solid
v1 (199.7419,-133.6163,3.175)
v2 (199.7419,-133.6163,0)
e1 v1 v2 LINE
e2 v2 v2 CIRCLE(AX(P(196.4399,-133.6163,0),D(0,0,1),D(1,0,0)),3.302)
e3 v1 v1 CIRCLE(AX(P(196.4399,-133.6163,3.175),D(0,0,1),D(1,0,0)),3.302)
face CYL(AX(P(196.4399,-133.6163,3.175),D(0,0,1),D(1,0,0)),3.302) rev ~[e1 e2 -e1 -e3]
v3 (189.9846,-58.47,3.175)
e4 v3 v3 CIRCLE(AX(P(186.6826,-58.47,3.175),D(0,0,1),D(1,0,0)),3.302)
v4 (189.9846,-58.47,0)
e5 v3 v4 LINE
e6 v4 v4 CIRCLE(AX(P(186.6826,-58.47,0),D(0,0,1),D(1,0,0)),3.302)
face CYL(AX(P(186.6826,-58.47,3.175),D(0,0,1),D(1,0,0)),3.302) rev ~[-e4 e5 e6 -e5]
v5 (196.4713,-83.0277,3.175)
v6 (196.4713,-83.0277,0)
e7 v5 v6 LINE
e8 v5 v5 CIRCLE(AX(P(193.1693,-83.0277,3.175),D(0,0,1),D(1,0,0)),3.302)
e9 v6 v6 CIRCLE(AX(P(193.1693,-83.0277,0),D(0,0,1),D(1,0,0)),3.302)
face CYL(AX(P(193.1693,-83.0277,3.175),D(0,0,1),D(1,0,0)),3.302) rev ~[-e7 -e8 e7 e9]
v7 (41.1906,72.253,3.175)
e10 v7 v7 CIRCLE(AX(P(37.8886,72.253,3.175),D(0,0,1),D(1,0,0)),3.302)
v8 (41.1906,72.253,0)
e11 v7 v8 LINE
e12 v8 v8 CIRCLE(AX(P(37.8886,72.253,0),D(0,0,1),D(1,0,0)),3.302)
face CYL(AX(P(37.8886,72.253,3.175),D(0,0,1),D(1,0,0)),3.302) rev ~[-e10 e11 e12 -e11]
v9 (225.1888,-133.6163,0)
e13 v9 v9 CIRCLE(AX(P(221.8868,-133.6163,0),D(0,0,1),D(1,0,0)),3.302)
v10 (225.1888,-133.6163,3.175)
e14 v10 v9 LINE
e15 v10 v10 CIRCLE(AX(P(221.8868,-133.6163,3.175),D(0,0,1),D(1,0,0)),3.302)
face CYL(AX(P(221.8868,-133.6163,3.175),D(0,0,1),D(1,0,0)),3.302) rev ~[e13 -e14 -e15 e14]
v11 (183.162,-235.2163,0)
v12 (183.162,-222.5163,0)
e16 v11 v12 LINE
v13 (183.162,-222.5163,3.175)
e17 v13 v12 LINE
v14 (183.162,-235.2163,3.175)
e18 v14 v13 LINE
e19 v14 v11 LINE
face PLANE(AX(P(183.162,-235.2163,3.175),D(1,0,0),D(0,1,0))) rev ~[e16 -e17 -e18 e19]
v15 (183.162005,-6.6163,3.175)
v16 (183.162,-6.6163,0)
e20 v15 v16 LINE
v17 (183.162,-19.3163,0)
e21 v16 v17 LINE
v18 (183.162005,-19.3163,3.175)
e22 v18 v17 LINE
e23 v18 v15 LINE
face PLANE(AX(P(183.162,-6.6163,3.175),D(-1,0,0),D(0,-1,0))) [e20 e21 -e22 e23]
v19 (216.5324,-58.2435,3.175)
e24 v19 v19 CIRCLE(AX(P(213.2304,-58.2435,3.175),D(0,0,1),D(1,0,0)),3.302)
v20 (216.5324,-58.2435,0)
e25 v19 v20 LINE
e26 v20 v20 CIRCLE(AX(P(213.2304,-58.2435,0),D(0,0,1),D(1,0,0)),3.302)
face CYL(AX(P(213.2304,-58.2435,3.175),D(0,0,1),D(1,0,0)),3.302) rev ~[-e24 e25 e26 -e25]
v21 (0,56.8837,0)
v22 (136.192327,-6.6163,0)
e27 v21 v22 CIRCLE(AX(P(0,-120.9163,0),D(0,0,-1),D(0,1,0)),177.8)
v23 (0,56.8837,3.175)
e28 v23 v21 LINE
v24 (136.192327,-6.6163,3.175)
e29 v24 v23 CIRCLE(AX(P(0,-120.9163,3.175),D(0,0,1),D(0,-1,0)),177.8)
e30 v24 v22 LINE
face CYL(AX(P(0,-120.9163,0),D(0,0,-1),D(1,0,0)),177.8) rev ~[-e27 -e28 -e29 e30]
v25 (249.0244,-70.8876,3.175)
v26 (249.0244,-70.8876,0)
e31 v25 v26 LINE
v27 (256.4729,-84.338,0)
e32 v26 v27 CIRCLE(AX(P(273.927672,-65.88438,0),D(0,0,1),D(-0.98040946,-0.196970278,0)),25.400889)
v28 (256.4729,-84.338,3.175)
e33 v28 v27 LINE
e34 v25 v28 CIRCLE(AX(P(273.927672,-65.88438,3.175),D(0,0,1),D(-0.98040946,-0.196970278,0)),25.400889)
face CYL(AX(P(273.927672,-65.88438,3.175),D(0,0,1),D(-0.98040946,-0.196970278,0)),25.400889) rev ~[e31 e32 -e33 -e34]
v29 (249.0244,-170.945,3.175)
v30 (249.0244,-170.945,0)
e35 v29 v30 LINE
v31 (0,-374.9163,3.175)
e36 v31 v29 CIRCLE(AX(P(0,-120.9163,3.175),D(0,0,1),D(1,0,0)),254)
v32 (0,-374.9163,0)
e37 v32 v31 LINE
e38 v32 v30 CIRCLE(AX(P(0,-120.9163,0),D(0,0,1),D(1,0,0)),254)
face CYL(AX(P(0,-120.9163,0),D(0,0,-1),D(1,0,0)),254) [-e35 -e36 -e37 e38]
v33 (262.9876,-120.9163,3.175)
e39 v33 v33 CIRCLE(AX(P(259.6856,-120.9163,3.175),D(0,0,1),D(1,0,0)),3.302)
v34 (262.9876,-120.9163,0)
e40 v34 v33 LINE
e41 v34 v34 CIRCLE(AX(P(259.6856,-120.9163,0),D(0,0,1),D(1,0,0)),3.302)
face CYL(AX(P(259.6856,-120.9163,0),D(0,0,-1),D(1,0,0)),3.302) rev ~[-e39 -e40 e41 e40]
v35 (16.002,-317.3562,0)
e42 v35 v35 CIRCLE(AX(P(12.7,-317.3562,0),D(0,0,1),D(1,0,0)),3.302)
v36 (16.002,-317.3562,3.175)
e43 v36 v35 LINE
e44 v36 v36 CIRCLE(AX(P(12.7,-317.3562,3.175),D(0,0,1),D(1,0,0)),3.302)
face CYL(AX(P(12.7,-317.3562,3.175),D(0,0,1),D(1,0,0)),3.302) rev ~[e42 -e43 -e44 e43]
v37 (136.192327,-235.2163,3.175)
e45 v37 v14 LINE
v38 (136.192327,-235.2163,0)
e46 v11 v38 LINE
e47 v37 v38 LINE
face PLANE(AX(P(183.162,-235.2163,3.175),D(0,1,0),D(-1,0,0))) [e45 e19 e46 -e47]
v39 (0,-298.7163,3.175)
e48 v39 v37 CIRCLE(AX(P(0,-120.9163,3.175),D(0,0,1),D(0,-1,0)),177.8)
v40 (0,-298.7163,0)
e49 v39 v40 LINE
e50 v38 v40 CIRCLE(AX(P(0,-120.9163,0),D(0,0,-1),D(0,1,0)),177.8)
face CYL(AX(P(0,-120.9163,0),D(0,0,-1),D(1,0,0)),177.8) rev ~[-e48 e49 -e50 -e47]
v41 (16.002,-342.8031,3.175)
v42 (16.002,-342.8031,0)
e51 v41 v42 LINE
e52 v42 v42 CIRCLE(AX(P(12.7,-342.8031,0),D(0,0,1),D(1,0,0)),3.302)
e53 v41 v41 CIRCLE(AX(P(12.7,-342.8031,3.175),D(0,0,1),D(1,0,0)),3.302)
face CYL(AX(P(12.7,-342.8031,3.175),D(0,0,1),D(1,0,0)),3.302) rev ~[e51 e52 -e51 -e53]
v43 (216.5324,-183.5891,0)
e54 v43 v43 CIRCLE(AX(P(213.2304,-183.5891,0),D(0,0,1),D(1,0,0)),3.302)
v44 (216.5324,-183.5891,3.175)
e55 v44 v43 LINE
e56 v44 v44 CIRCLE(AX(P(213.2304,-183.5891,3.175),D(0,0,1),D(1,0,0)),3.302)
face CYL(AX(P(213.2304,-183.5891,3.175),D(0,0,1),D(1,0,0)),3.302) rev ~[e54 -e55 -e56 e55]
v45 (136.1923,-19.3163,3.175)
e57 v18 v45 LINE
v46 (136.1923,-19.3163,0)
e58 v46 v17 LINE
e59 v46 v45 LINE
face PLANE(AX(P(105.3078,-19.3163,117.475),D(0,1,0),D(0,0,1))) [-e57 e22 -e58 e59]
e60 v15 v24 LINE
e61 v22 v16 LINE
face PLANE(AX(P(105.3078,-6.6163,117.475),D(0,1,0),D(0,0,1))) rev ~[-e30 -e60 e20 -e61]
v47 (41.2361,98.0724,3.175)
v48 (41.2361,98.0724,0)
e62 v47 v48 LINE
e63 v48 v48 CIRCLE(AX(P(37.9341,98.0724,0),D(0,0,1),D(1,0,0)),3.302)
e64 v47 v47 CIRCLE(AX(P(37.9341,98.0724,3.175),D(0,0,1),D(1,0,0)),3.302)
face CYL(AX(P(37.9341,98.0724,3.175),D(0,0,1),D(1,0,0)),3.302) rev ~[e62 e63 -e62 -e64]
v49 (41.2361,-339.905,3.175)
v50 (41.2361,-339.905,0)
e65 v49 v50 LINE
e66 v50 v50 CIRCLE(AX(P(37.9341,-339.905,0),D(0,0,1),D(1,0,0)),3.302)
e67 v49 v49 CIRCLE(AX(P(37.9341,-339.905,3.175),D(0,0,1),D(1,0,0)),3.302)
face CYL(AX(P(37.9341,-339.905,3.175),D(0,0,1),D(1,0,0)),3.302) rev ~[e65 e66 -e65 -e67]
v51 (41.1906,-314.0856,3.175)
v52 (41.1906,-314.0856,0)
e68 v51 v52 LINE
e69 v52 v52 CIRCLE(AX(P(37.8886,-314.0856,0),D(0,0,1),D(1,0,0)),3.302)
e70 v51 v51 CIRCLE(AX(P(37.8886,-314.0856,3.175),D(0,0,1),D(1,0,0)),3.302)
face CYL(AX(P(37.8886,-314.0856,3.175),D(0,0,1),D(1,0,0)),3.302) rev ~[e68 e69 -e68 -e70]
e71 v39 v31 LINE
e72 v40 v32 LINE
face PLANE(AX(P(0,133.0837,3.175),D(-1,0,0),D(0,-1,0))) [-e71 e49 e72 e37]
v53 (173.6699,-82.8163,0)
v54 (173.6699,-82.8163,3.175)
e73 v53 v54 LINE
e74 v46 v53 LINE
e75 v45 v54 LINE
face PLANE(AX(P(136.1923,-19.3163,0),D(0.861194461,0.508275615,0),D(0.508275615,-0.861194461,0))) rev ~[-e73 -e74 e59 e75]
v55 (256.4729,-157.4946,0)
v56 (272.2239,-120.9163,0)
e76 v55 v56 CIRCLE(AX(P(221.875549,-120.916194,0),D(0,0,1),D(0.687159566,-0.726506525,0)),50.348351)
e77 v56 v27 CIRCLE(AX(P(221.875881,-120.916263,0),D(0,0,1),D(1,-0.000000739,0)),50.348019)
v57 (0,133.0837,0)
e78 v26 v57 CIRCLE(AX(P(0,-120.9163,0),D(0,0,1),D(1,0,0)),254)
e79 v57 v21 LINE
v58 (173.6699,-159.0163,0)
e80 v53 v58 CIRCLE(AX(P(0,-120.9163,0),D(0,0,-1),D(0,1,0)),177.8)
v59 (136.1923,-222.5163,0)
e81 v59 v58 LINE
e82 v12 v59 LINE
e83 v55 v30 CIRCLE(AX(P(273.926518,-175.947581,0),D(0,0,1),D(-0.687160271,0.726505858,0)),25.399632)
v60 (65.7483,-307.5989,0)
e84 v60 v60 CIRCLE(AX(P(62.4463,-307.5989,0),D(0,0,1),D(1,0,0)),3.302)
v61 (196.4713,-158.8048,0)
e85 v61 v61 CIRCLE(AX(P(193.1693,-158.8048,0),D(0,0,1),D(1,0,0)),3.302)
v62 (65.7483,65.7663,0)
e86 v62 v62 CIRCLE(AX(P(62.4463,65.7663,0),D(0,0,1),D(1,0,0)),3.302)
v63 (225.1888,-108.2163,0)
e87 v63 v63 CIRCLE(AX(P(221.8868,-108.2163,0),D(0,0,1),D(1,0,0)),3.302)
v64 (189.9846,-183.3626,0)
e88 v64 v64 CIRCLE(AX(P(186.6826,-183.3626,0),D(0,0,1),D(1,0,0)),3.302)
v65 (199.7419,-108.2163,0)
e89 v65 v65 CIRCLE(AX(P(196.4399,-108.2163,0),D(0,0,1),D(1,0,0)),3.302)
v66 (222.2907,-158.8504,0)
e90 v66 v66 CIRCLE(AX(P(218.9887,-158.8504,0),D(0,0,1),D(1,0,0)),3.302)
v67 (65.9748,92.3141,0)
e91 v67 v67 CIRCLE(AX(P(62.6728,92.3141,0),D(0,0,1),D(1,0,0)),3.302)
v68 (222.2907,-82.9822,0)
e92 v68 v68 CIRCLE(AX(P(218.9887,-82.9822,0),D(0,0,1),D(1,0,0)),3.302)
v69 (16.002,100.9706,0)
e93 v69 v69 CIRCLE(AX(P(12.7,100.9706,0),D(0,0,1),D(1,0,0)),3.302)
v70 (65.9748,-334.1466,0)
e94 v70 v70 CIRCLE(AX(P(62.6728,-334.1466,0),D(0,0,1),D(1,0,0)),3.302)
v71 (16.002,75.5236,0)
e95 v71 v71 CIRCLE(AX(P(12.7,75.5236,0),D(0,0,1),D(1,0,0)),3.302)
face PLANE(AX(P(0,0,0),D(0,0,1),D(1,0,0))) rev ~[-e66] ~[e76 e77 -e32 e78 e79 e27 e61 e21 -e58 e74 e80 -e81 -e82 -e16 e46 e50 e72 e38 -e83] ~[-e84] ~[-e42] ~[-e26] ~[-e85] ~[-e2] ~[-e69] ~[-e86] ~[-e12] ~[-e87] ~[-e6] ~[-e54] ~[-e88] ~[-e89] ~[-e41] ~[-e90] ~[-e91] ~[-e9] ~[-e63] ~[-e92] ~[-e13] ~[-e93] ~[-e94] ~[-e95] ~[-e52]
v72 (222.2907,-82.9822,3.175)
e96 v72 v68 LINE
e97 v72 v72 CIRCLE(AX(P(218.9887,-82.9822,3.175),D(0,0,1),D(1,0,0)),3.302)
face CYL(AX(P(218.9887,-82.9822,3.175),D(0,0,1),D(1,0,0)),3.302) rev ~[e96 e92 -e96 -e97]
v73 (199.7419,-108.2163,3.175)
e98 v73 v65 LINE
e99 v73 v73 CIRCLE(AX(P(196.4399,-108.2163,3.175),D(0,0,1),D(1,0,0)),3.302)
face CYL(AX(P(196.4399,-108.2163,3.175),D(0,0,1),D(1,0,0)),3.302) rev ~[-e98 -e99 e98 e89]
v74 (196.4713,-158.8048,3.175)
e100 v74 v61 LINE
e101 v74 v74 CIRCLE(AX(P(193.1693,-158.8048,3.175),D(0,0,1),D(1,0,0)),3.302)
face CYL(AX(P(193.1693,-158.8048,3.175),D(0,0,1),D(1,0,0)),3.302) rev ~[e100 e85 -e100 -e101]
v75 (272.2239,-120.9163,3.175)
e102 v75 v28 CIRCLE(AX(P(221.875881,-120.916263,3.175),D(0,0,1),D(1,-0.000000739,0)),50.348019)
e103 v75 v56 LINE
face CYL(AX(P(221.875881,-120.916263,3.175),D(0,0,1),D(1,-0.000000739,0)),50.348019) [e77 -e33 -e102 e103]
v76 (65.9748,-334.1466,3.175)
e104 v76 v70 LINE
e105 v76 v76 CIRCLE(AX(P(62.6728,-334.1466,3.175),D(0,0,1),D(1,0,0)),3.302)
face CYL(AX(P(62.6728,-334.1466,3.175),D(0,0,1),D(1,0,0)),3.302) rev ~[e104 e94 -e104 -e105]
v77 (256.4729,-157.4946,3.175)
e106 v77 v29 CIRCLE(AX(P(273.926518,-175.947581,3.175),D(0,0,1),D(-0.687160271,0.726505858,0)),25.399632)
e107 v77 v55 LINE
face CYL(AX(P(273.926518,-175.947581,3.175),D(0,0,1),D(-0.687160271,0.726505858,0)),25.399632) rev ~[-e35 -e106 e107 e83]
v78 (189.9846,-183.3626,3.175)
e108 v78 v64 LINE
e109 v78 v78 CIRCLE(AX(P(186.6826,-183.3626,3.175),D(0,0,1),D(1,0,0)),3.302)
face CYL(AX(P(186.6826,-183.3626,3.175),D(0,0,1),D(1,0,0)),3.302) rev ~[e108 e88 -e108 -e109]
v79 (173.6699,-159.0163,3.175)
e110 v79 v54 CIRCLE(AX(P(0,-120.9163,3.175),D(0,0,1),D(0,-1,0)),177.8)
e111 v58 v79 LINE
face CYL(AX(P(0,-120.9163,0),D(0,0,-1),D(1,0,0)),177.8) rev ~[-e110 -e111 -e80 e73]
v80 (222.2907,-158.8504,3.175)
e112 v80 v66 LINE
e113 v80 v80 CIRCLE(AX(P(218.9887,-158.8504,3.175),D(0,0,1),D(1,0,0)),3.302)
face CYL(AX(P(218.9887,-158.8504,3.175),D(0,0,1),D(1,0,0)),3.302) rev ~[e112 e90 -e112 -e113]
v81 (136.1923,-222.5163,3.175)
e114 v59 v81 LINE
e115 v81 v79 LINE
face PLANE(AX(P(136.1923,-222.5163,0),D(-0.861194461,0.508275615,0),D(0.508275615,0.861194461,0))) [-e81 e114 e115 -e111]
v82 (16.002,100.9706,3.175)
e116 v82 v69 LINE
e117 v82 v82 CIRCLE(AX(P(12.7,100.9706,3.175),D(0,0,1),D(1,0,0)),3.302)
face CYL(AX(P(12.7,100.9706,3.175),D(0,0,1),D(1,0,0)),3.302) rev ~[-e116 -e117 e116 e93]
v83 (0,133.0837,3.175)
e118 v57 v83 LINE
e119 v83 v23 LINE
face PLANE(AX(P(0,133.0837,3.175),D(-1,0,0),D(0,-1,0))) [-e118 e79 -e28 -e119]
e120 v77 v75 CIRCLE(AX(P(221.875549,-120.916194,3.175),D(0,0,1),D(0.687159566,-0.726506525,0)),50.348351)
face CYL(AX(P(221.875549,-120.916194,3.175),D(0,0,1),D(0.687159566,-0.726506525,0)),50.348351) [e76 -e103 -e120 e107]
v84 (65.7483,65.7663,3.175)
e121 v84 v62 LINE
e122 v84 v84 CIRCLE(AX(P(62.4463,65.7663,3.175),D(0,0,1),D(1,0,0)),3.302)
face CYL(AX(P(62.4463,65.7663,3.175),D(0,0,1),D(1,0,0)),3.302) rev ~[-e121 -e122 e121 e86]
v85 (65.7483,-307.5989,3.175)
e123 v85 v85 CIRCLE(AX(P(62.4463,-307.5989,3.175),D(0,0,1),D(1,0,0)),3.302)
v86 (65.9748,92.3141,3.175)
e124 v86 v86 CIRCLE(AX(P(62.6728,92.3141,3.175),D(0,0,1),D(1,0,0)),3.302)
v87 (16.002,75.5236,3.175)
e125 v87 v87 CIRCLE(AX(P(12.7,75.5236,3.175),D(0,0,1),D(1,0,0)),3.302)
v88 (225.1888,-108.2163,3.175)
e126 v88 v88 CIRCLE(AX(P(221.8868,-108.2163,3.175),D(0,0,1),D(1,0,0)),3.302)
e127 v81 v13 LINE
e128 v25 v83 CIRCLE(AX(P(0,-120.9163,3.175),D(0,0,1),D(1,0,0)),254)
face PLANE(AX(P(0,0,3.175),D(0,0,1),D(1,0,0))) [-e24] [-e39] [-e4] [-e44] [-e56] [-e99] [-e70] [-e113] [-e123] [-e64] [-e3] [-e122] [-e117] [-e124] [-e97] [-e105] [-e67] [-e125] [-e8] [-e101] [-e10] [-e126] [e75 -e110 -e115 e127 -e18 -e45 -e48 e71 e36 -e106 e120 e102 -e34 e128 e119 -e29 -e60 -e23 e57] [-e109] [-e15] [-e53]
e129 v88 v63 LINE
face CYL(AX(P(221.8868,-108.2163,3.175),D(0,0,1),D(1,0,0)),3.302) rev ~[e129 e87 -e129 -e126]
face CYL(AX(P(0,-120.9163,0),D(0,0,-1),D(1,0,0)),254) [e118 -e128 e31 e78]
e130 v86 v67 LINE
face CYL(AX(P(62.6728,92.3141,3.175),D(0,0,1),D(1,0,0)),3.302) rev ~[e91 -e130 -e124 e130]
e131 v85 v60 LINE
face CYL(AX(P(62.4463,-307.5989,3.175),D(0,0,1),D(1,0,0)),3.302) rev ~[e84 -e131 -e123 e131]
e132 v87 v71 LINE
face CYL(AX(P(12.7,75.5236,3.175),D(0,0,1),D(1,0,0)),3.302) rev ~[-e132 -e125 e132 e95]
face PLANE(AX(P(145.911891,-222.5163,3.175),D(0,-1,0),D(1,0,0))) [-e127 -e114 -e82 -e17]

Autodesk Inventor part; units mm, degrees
ref_plane "YZ Plane" through (0, 0, 0) normal (1, 0, 0) x (0, 1, 0)
ref_plane "XZ Plane" through (0, 0, 0) normal (0, 1, 0) x (-1, 0, 0)
sketch "Sketch1" plane through (0, 0, 0) normal (0, 0, 1) x (1, 0, 0)
  circle A0 centre (62.4463, 65.7663) radius 3.175 projected
  circle A1 centre (37.8886, 72.253) radius 3.175 projected
  circle A2 centre (12.7, 75.5236) radius 3.175 projected
  circle A3 centre (12.7, 100.9706) radius 3.175 projected
  circle A4 centre (37.9341, 98.0724) radius 3.175 projected
  circle A5 centre (62.6728, 92.3141) radius 3.175 projected
  circle A6 centre (-62.6728, 92.3141) radius 3.175 projected
  circle A7 centre (-37.9341, 98.0724) radius 3.175 projected
  circle A8 centre (-12.7, 100.9706) radius 3.175 projected
  circle A9 centre (-12.7, 75.5236) radius 3.175 projected
  circle A10 centre (-37.8886, 72.253) radius 3.175 projected
  circle A11 centre (-62.4463, 65.7663) radius 3.175 projected
  circle A12 centre (-196.4399, -108.2163) radius 3.175 projected
  circle A13 centre (-193.1693, -83.0277) radius 3.175 projected
  circle A14 centre (-186.6826, -58.47) radius 3.175 projected
  circle A15 centre (-213.2304, -58.2435) radius 3.175 projected
  circle A16 centre (-218.9887, -82.9822) radius 3.175 projected
  circle A17 centre (-221.8868, -108.2163) radius 3.175 projected
  circle A18 centre (196.4399, -108.2163) radius 3.175 projected
  circle A19 centre (193.1693, -83.0277) radius 3.175 projected
  circle A20 centre (186.6826, -58.47) radius 3.175 projected
  circle A21 centre (213.2304, -58.2435) radius 3.175 projected
  circle A22 centre (218.9887, -82.9822) radius 3.175 projected
  circle A23 centre (221.8868, -108.2163) radius 3.175 projected
  arc A24 (241.3, -120.9163) -> (-241.3, -120.9163) centre (0, -120.9163) ccw projected
  line L0 (-241.3, -120.9163) -> (-177.8, -120.9163) projected
  arc A25 (177.8, -120.9163) -> (-177.8, -120.9163) centre (0, -120.9163) ccw projected
  line L1 (177.8, -120.9163) -> (241.3, -120.9163) projected
  circle A26 centre (-62.4463, -307.5989) radius 3.175 projected
  circle A27 centre (-37.8886, -314.0856) radius 3.175 projected
  circle A28 centre (-12.7, -317.3562) radius 3.175 projected
  circle A29 centre (-12.7, -342.8031) radius 3.175 projected
  circle A30 centre (-37.9341, -339.905) radius 3.175 projected
  circle A31 centre (-62.6728, -334.1466) radius 3.175 projected
  circle A32 centre (62.6728, -334.1466) radius 3.175 projected
  circle A33 centre (37.9341, -339.905) radius 3.175 projected
  circle A34 centre (12.7, -342.8031) radius 3.175 projected
  circle A35 centre (12.7, -317.3562) radius 3.175 projected
  circle A36 centre (37.8886, -314.0856) radius 3.175 projected
  circle A37 centre (62.4463, -307.5989) radius 3.175 projected
  circle A38 centre (196.4399, -133.6163) radius 3.175 projected
  circle A39 centre (193.1693, -158.8048) radius 3.175 projected
  circle A40 centre (186.6826, -183.3626) radius 3.175 projected
  circle A41 centre (213.2304, -183.5891) radius 3.175 projected
  circle A42 centre (218.9887, -158.8504) radius 3.175 projected
  circle A43 centre (221.8868, -133.6163) radius 3.175 projected
  circle A44 centre (-196.4399, -133.6163) radius 3.175 projected
  circle A45 centre (-193.1693, -158.8048) radius 3.175 projected
  circle A46 centre (-186.6826, -183.3626) radius 3.175 projected
  circle A47 centre (-213.2304, -183.5891) radius 3.175 projected
  circle A48 centre (-218.9887, -158.8504) radius 3.175 projected
  circle A49 centre (-221.8868, -133.6163) radius 3.175 projected
  arc A50 (-241.3, -120.9163) -> (241.3, -120.9163) centre (0, -120.9163) ccw projected
  line L2 (241.3, -120.9163) -> (177.8, -120.9163) projected
  arc A51 (-177.8, -120.9163) -> (177.8, -120.9163) centre (0, -120.9163) ccw projected
  line L3 (-177.8, -120.9163) -> (-241.3, -120.9163) projected
  circle A52 centre (0, -120.9163) radius 254
  line L4 (-254, -120.9163) -> (-254, 133.0837)
  line L5 (0, 133.0837) -> (-254, 133.0837)
  line L6 (-254, 100.9706) -> (-254, 104.1456)
  line L7 (-254, 56.8837) -> (-254, 60.0587)
  line L8 (0, -120.9163) -> (-254, 133.0837)
  line L9 (-179.6051, 58.6888) -> (-254, 133.0837)
  circle A53 centre (-216.8026, 95.8863) radius 3.302
  circle A54 centre (259.6856, -120.9163) radius 3.302
  arc A55 (271.0214, -121.5373) -> (259.974, -104.2042) centre (252.2597, -121.3082) ccw
  arc A56 (252.5671, -93.9743) -> (259.974, -104.2042) centre (265.1954, -92.6272) ccw
  line L10 (252.5671, -93.9743) -> (247.0534, -93.9743)
  line L11 (247.0534, -93.9743) -> (247.0534, -120.9163)
  arc A57 (257.0711, -139.4439) -> (271.0214, -121.5373) centre (252.2597, -121.3082) ccw
  arc A58 (257.0711, -139.4439) -> (252.5671, -147.8582) centre (265.1954, -149.2053) ccw
  line L12 (252.5671, -147.8582) -> (247.0534, -147.8582)
  line L13 (247.0534, -147.8582) -> (247.0534, -120.9163)
  line L14 (-254, -120.9163) -> (-254, -374.9163)
  line L15 (-254, -374.9163) -> (0, -374.9163)
  point P0 (0, 0)
  dimension "d0" = 508
  dimension "d3" = 6.604
  dimension "d7" = 6.604
  dimension "d8" = 12.7
extrude "Extrusion1" add sketch "Sketch1" along normal blind 3.175 contours L1 A25 L8 A24 | A50 L0 A51 L1 | L8 A25 L0 A24 | A52 L12 L13 L11 L10 | A52 A56 A55 A57 A58 | L10 L11 L13 L12 A52 | A52 L8 A53 L5 | L15 L14 A52 | A52 L4 L8 A53 | A53 L8 | L8 A53
sketch "Sketch2" plane through (0, 0, 3.175) normal (0, 0, 1) x (1, 0, 0)
  circle A0 centre (259.6856, -120.9163) radius 3.302 projected
  arc A1 (252.5671, -93.9743) -> (0, 133.0837) centre (0, -120.9163) ccw projected
  line L0 (0, 133.0837) -> (-254, 133.0837) projected
  line L1 (-254, 133.0837) -> (-254, -374.9163) projected
  line L2 (-254, -374.9163) -> (0, -374.9163) projected
  arc A2 (0, -374.9163) -> (252.5671, -147.8582) centre (0, -120.9163) ccw projected
  arc A3 (257.0711, -139.4439) -> (252.5671, -147.8582) centre (265.1954, -149.2053) ccw projected
  arc A4 (257.0711, -139.4439) -> (259.974, -104.2042) centre (252.2597, -121.3082) ccw projected
  arc A5 (252.5671, -93.9743) -> (259.974, -104.2042) centre (265.1954, -92.6272) ccw projected
  circle A6 centre (-62.4463, -307.5989) radius 3.175 projected
  circle A7 centre (-37.8886, -314.0856) radius 3.175 projected
  circle A8 centre (-12.7, -317.3562) radius 3.175 projected
  circle A9 centre (-12.7, -342.8031) radius 3.175 projected
  circle A10 centre (-37.9341, -339.905) radius 3.175 projected
  circle A11 centre (-62.6728, -334.1466) radius 3.175 projected
  circle A12 centre (62.6728, -334.1466) radius 3.175 projected
  circle A13 centre (37.9341, -339.905) radius 3.175 projected
  circle A14 centre (12.7, -342.8031) radius 3.175 projected
  circle A15 centre (12.7, -317.3562) radius 3.175 projected
  circle A16 centre (37.8886, -314.0856) radius 3.175 projected
  circle A17 centre (62.4463, -307.5989) radius 3.175 projected
  circle A18 centre (196.4399, -133.6163) radius 3.175 projected
  circle A19 centre (193.1693, -158.8048) radius 3.175 projected
  circle A20 centre (186.6826, -183.3626) radius 3.175 projected
  circle A21 centre (213.2304, -183.5891) radius 3.175 projected
  circle A22 centre (218.9887, -158.8504) radius 3.175 projected
  circle A23 centre (221.8868, -133.6163) radius 3.175 projected
  circle A24 centre (-196.4399, -133.6163) radius 3.175 projected
  circle A25 centre (-193.1693, -158.8048) radius 3.175 projected
  circle A26 centre (-186.6826, -183.3626) radius 3.175 projected
  circle A27 centre (-213.2304, -183.5891) radius 3.175 projected
  circle A28 centre (-218.9887, -158.8504) radius 3.175 projected
  circle A29 centre (-221.8868, -133.6163) radius 3.175 projected
  circle A30 centre (221.8868, -108.2163) radius 3.175 projected
  circle A31 centre (218.9887, -82.9822) radius 3.175 projected
  circle A32 centre (213.2304, -58.2435) radius 3.175 projected
  circle A33 centre (186.6826, -58.47) radius 3.175 projected
  circle A34 centre (193.1693, -83.0277) radius 3.175 projected
  circle A35 centre (196.4399, -108.2163) radius 3.175 projected
  circle A36 centre (-221.8868, -108.2163) radius 3.175 projected
  circle A37 centre (-218.9887, -82.9822) radius 3.175 projected
  circle A38 centre (-213.2304, -58.2435) radius 3.175 projected
  circle A39 centre (-186.6826, -58.47) radius 3.175 projected
  circle A40 centre (-193.1693, -83.0277) radius 3.175 projected
  circle A41 centre (-196.4399, -108.2163) radius 3.175 projected
  circle A42 centre (-62.4463, 65.7663) radius 3.175 projected
  circle A43 centre (-37.8886, 72.253) radius 3.175 projected
  circle A44 centre (-12.7, 75.5236) radius 3.175 projected
  circle A45 centre (-12.7, 100.9706) radius 3.175 projected
  circle A46 centre (-37.9341, 98.0724) radius 3.175 projected
  circle A47 centre (-62.6728, 92.3141) radius 3.175 projected
  circle A48 centre (62.6728, 92.3141) radius 3.175 projected
  circle A49 centre (37.9341, 98.0724) radius 3.175 projected
  circle A50 centre (12.7, 100.9706) radius 3.175 projected
  circle A51 centre (12.7, 75.5236) radius 3.175 projected
  circle A52 centre (37.8886, 72.253) radius 3.175 projected
  circle A53 centre (62.4463, 65.7663) radius 3.175 projected
  circle A54 centre (0, -120.9163) radius 177.8 projected
  line L3 (0, -120.9163) -> (-321.8066, -120.9163)
  line L4 (-321.8066, -120.9163) -> (-321.8066, -440.0394)
  line L5 (-321.8066, -440.0394) -> (0, -440.0394)
  line L6 (0, -440.0394) -> (0, -120.9163)
  line L7 (0, -120.9163) -> (-359.6849, -120.9163)
  line L8 (-359.6849, -120.9163) -> (-359.6849, 186.2685)
  line L9 (-359.6849, 186.2685) -> (0, 186.2685)
  line L10 (0, 186.2685) -> (0, -120.9163)
  point P0 (0, 0)
extrude "Extrusion2" cut sketch "Sketch2" against normal blind 25.4 contours L10 A54 L3 L1 L0 | L0 L1 L3 L7 L8 L9 L10 | L10 L3 A54 | L3 A54 L6 L2 L1 | L1 L2 L6 L5 L4 L3 | L3 L6 A54
sketch "Sketch3" plane through (0, 0, 3.175) normal (0, 0, 1) x (1, 0, 0)
  line L0 (0, 133.0837) -> (0, 56.8837) projected
  arc A0 (0, -298.7163) -> (0, 56.8837) centre (0, -120.9163) ccw projected
  line L1 (0, -298.7163) -> (0, -374.9163) projected
  arc A1 (0, -374.9163) -> (252.5671, -147.8582) centre (0, -120.9163) ccw projected
  arc A2 (257.0711, -139.4439) -> (252.5671, -147.8582) centre (265.1954, -149.2053) ccw projected
  arc A3 (257.0711, -139.4439) -> (259.974, -104.2042) centre (252.2597, -121.3082) ccw projected
  arc A4 (252.5671, -93.9743) -> (259.974, -104.2042) centre (265.1954, -92.6272) ccw projected
  arc A5 (252.5671, -93.9743) -> (0, 133.0837) centre (0, -120.9163) ccw projected
  circle A6 centre (259.6856, -120.9163) radius 3.302 projected
  circle A7 centre (62.6728, -334.1466) radius 3.175 projected
  circle A8 centre (37.9341, -339.905) radius 3.175 projected
  circle A9 centre (12.7, -342.8031) radius 3.175 projected
  circle A10 centre (12.7, -317.3562) radius 3.175 projected
  circle A11 centre (37.8886, -314.0856) radius 3.175 projected
  circle A12 centre (62.4463, -307.5989) radius 3.175 projected
  circle A13 centre (196.4399, -133.6163) radius 3.175 projected
  circle A14 centre (193.1693, -158.8048) radius 3.175 projected
  circle A15 centre (186.6826, -183.3626) radius 3.175 projected
  circle A16 centre (213.2304, -183.5891) radius 3.175 projected
  circle A17 centre (218.9887, -158.8504) radius 3.175 projected
  circle A18 centre (221.8868, -133.6163) radius 3.175 projected
  circle A19 centre (221.8868, -108.2163) radius 3.175 projected
  circle A20 centre (218.9887, -82.9822) radius 3.175 projected
  circle A21 centre (213.2304, -58.2435) radius 3.175 projected
  circle A22 centre (186.6826, -58.47) radius 3.175 projected
  circle A23 centre (193.1693, -83.0277) radius 3.175 projected
  circle A24 centre (196.4399, -108.2163) radius 3.175 projected
  circle A25 centre (62.6728, 92.3141) radius 3.175 projected
  circle A26 centre (37.9341, 98.0724) radius 3.175 projected
  circle A27 centre (12.7, 100.9706) radius 3.175 projected
  circle A28 centre (12.7, 75.5236) radius 3.175 projected
  circle A29 centre (37.8886, 72.253) radius 3.175 projected
  circle A30 centre (62.4463, 65.7663) radius 3.175 projected
  line L2 (259.6856, -120.9163) -> (273.9072, -120.9163)
  arc A31 (252.5671, -93.9743) -> (0, 133.0837) centre (0, -120.9163) ccw projected
  arc A32 (272.2239, -120.9163) -> (256.4729, -84.338) centre (221.8757, -120.9163) ccw
  arc A33 (249.0244, -70.8876) -> (248.8079, -69.822) centre (0, -120.9163) ccw
  arc A34 (249.0244, -70.8876) -> (256.4729, -84.338) centre (273.9268, -65.8847) ccw
  arc A35 (256.4729, -157.4946) -> (272.2239, -120.9163) centre (221.8757, -120.9163) ccw
  arc A36 (256.4729, -157.4946) -> (249.0244, -170.945) centre (273.9268, -175.9478) ccw
  line L3 (249.0244, -70.8876) -> (249.0244, -170.945)
  point P0 (0, 0)
  dimension "d13" = 25.4
extrude "Extrusion3" add sketch "Sketch3" against normal blind 3.175 contours A34 A32 L2 A3 A4 A5 | A5 A4 A3 A2 A1 L3 | A1 A2 A3 L2 A35 A36
sketch "Sketch4" plane through (0, 0, 3.175) normal (0, 0, 1) x (1, 0, 0)
  circle A0 centre (259.6856, -120.9163) radius 3.302 projected
  circle A1 centre (62.4463, 65.7663) radius 3.175 projected
  circle A2 centre (37.8886, 72.253) radius 3.175 projected
  circle A3 centre (12.7, 75.5236) radius 3.175 projected
  circle A4 centre (12.7, 100.9706) radius 3.175 projected
  circle A5 centre (37.9341, 98.0724) radius 3.175 projected
  circle A6 centre (62.6728, 92.3141) radius 3.175 projected
  circle A7 centre (196.4399, -108.2163) radius 3.175 projected
  circle A8 centre (193.1693, -83.0277) radius 3.175 projected
  circle A9 centre (186.6826, -58.47) radius 3.175 projected
  circle A10 centre (213.2304, -58.2435) radius 3.175 projected
  circle A11 centre (218.9887, -82.9822) radius 3.175 projected
  circle A12 centre (221.8868, -108.2163) radius 3.175 projected
  circle A13 centre (221.8868, -133.6163) radius 3.175 projected
  circle A14 centre (218.9887, -158.8504) radius 3.175 projected
  circle A15 centre (213.2304, -183.5891) radius 3.175 projected
  circle A16 centre (186.6826, -183.3626) radius 3.175 projected
  circle A17 centre (193.1693, -158.8048) radius 3.175 projected
  circle A18 centre (196.4399, -133.6163) radius 3.175 projected
  circle A19 centre (62.4463, -307.5989) radius 3.175 projected
  circle A20 centre (37.8886, -314.0856) radius 3.175 projected
  circle A21 centre (12.7, -317.3562) radius 3.175 projected
  circle A22 centre (12.7, -342.8031) radius 3.175 projected
  circle A23 centre (37.9341, -339.905) radius 3.175 projected
  circle A24 centre (62.6728, -334.1466) radius 3.175 projected
  arc A25 (256.4729, -157.4946) -> (249.0244, -170.945) centre (273.9268, -175.9478) ccw projected
  arc A26 (256.4729, -157.4946) -> (256.4729, -84.338) centre (221.8757, -120.9163) ccw projected
  arc A27 (249.0244, -70.8876) -> (256.4729, -84.338) centre (273.9268, -65.8847) ccw projected
  arc A28 (249.0244, -70.8876) -> (0, 133.0837) centre (0, -120.9163) ccw projected
  line L0 (0, 133.0837) -> (0, 56.8837) projected
  arc A29 (0, -298.7163) -> (0, 56.8837) centre (0, -120.9163) ccw projected
  line L1 (0, -298.7163) -> (0, -374.9163) projected
  arc A30 (0, -374.9163) -> (249.0244, -170.945) centre (0, -120.9163) ccw projected
  circle A31 centre (62.4463, 65.7663) radius 3.302
  circle A32 centre (62.6728, 92.3141) radius 3.302
  circle A33 centre (37.8886, 72.253) radius 3.302
  circle A34 centre (37.9341, 98.0724) radius 3.302
  circle A35 centre (12.7, 75.5236) radius 3.302
  circle A36 centre (12.7, 100.9706) radius 3.302
  circle A37 centre (213.2304, -58.2435) radius 3.302
  circle A38 centre (186.6826, -58.47) radius 3.302
  circle A39 centre (193.1693, -83.0277) radius 3.302
  circle A40 centre (218.9887, -82.9822) radius 3.302
  circle A41 centre (221.8868, -108.2163) radius 3.302
  circle A42 centre (196.4399, -108.2163) radius 3.302
  circle A43 centre (196.4399, -133.6163) radius 3.302
  circle A44 centre (221.8868, -133.6163) radius 3.302
  circle A45 centre (218.9887, -158.8504) radius 3.302
  circle A46 centre (193.1693, -158.8048) radius 3.302
  circle A47 centre (186.6826, -183.3626) radius 3.302
  circle A48 centre (213.2304, -183.5891) radius 3.302
  circle A49 centre (62.4463, -307.5989) radius 3.302
  circle A50 centre (62.6728, -334.1466) radius 3.302
  circle A51 centre (37.9341, -339.905) radius 3.302
  circle A52 centre (37.8886, -314.0856) radius 3.302
  circle A53 centre (12.7, -317.3562) radius 3.302
  circle A54 centre (12.7, -342.8031) radius 3.302
  point P0 (0, 0)
  dimension "d19" = 6.604
  dimension "d20" = 6.604
  dimension "d21" = 6.604
  dimension "d22" = 6.604
  dimension "d23" = 6.604
  dimension "d24" = 6.604
  dimension "d25" = 6.604
  dimension "d26" = 6.604
  dimension "d27" = 6.604
  dimension "d28" = 6.604
  dimension "d29" = 6.604
  dimension "d30" = 6.604
  dimension "d31" = 6.604
  dimension "d32" = 6.604
  dimension "d33" = 6.604
  dimension "d34" = 6.604
  dimension "d35" = 6.604
  dimension "d36" = 6.604
  dimension "d37" = 6.604
  dimension "d38" = 6.604
  dimension "d39" = 6.604
  dimension "d40" = 6.604
  dimension "d41" = 6.604
  dimension "d42" = 6.604
extrude "Extrusion4" cut sketch "Sketch4" against normal blind 3.175 contours A1 | A2 | A3 | A4 | A5 | A6 | A7 | A8 | A9 | A10 | A11 | A12 | A13 | A14 | A15 | A16 | A17 | A18 | A19 | A20 | A21 | A22 | A23 | A24 | A31 | A32 | A33 | A34 | A35 | A36 | A37 | A38 | A39 | A40 | A41 | A42 | A43 | A44 | A45 | A46 | A47 | A48 | A49 | A50 | A51 | A52 | A53 | A54
ref_plane "Work Plane1" through (105.3078, -6.6163, 117.475) normal (0, 1, 0) x (0, 0, 1)
sketch "Sketch5" plane through (105.3078, -6.6163, 117.475) normal (0, 1, 0) x (0, 0, 1)
  arc A0 (215.9, -105.3078) -> (-215.9, -105.3078) centre (0, -105.3078) ccw projected
  line L0 (-208.5631, -49.5025) -> (-31.405, -40.0564)
  line L1 (-31.405, -40.0564) -> (0, 110.5922)
  point P0 (-117.475, -105.3078)
extrude "Extrusion5" cut sketch "Sketch5" against normal blind 12.7
sketch "Sketch8" plane through (0, 0, 3.175) normal (0, 0, 1) x (1, 0, 0)
  line L0 (136.1923, -6.6163) -> (183.162, -6.6163) projected
  line L1 (183.162, -6.6163) -> (183.162, -19.3163) projected
  line L2 (183.162, -19.3163) -> (145.9119, -19.3163) projected
  arc A0 (0, -298.7163) -> (145.9119, -19.3163) centre (0, -120.9163) ccw projected
  line L3 (0, -298.7163) -> (0, -374.9163) projected
  arc A1 (0, -374.9163) -> (249.0244, -170.945) centre (0, -120.9163) ccw projected
  arc A2 (256.4729, -157.4946) -> (249.0244, -170.945) centre (273.9268, -175.9478) ccw projected
  arc A3 (256.4729, -157.4946) -> (256.4729, -84.338) centre (221.8757, -120.9163) ccw projected
  arc A4 (249.0244, -70.8876) -> (256.4729, -84.338) centre (273.9268, -65.8847) ccw projected
  arc A5 (249.0244, -70.8876) -> (0, 133.0837) centre (0, -120.9163) ccw projected
  line L4 (0, 133.0837) -> (0, 56.8837) projected
  arc A6 (136.1923, -6.6163) -> (0, 56.8837) centre (0, -120.9163) ccw projected
  circle A7 centre (259.6856, -120.9163) radius 3.302 projected
  circle A8 centre (12.7, -342.8031) radius 3.302 projected
  circle A9 centre (37.8886, -314.0856) radius 3.302 projected
  circle A10 centre (62.6728, -334.1466) radius 3.302 projected
  circle A11 centre (213.2304, -183.5891) radius 3.302 projected
  circle A12 centre (193.1693, -158.8048) radius 3.302 projected
  circle A13 centre (221.8868, -133.6163) radius 3.302 projected
  circle A14 centre (196.4399, -108.2163) radius 3.302 projected
  circle A15 centre (218.9887, -82.9822) radius 3.302 projected
  circle A16 centre (186.6826, -58.47) radius 3.302 projected
  circle A17 centre (12.7, 100.9706) radius 3.302 projected
  circle A18 centre (37.9341, 98.0724) radius 3.302 projected
  circle A19 centre (62.6728, 92.3141) radius 3.302 projected
  circle A20 centre (62.4463, 65.7663) radius 3.302 projected
  circle A21 centre (37.8886, 72.253) radius 3.302 projected
  circle A22 centre (12.7, 75.5236) radius 3.302 projected
  circle A23 centre (213.2304, -58.2435) radius 3.302 projected
  circle A24 centre (193.1693, -83.0277) radius 3.302 projected
  circle A25 centre (221.8868, -108.2163) radius 3.302 projected
  circle A26 centre (196.4399, -133.6163) radius 3.302 projected
  circle A27 centre (218.9887, -158.8504) radius 3.302 projected
  circle A28 centre (186.6826, -183.3626) radius 3.302 projected
  circle A29 centre (62.4463, -307.5989) radius 3.302 projected
  circle A30 centre (37.9341, -339.905) radius 3.302 projected
  circle A31 centre (12.7, -317.3562) radius 3.302 projected
  line L5 (181.142, -19.3163) -> (181.142, -6.6163) projected
  line L6 (136.1923, -6.6163) -> (183.162, -6.6163) projected
  line L7 (183.162, -6.6163) -> (116.6118, -6.6163)
  line L8 (116.6118, -6.6163) -> (116.6118, -19.3163)
  line L9 (116.6118, -19.3163) -> (183.162, -19.3163)
  line L10 (183.162, -19.3163) -> (183.162, -6.6163)
  line L11 (259.6856, -120.9163) -> (145.9119, -120.9163)
  line L12 (183.162, -235.2163) -> (116.6118, -235.2163)
  line L13 (116.6118, -222.5163) -> (183.162, -222.5163)
  line L14 (183.162, -222.5163) -> (113.9696, -222.5163)
  line L15 (113.9696, -222.5163) -> (113.9696, -235.2163)
  line L16 (113.9696, -235.2163) -> (183.162, -235.2163)
  line L17 (183.162, -235.2163) -> (183.162, -222.5163)
  point P0 (0, 0)
extrude "Extrusion6" cut sketch "Sketch8" against normal blind 25.4 contours L0 L5 L2 L9 L8 L7 | L0 L1 L2 L5 | L13 L17 L12 A0 | A0 L12 L16 L15 L14 L13
sketch "Sketch9" plane through (0, 0, 0) normal (0, 0, -1) x (-1, 0, 0)
  line L0 (-183.162, -222.5163) -> (-145.9119, -222.5163) projected
  arc A0 (-145.9119, -19.3163) -> (-145.9119, -222.5163) centre (0, -120.9163) ccw projected
  line L1 (-145.9119, -19.3163) -> (-183.162, -19.3163) projected
  line L2 (-183.162, -19.3163) -> (-183.162, -6.6163) projected
  line L3 (-183.162, -6.6163) -> (-136.1923, -6.6163) projected
  arc A1 (0, 56.8837) -> (-136.1923, -6.6163) centre (0, -120.9163) ccw projected
  line L4 (0, 56.8837) -> (0, 133.0837) projected
  arc A2 (0, 133.0837) -> (-249.0244, -70.8876) centre (0, -120.9163) ccw projected
  arc A3 (-256.4729, -84.338) -> (-249.0244, -70.8876) centre (-273.9268, -65.8847) ccw projected
  arc A4 (-256.4729, -84.338) -> (-256.4729, -157.4946) centre (-221.8757, -120.9163) ccw projected
  arc A5 (-249.0244, -170.945) -> (-256.4729, -157.4946) centre (-273.9268, -175.9478) ccw projected
  arc A6 (-249.0244, -170.945) -> (0, -374.9163) centre (0, -120.9163) ccw projected
  line L5 (0, -374.9163) -> (0, -298.7163) projected
  arc A7 (-136.1923, -235.2163) -> (0, -298.7163) centre (0, -120.9163) ccw projected
  line L6 (-136.1923, -235.2163) -> (-183.162, -235.2163) projected
  line L7 (-183.162, -235.2163) -> (-183.162, -222.5163) projected
  circle A8 centre (-12.7, -317.3562) radius 3.302 projected
  circle A9 centre (-37.9341, -339.905) radius 3.302 projected
  circle A10 centre (-62.4463, -307.5989) radius 3.302 projected
  circle A11 centre (-186.6826, -183.3626) radius 3.302 projected
  circle A12 centre (-218.9887, -158.8504) radius 3.302 projected
  circle A13 centre (-196.4399, -133.6163) radius 3.302 projected
  circle A14 centre (-221.8868, -108.2163) radius 3.302 projected
  circle A15 centre (-193.1693, -83.0277) radius 3.302 projected
  circle A16 centre (-213.2304, -58.2435) radius 3.302 projected
  circle A17 centre (-12.7, 75.5236) radius 3.302 projected
  circle A18 centre (-37.8886, 72.253) radius 3.302 projected
  circle A19 centre (-62.4463, 65.7663) radius 3.302 projected
  circle A20 centre (-62.6728, 92.3141) radius 3.302 projected
  circle A21 centre (-37.9341, 98.0724) radius 3.302 projected
  circle A22 centre (-12.7, 100.9706) radius 3.302 projected
  circle A23 centre (-186.6826, -58.47) radius 3.302 projected
  circle A24 centre (-218.9887, -82.9822) radius 3.302 projected
  circle A25 centre (-196.4399, -108.2163) radius 3.302 projected
  circle A26 centre (-221.8868, -133.6163) radius 3.302 projected
  circle A27 centre (-193.1693, -158.8048) radius 3.302 projected
  circle A28 centre (-213.2304, -183.5891) radius 3.302 projected
  circle A29 centre (-62.6728, -334.1466) radius 3.302 projected
  circle A30 centre (-37.8886, -314.0856) radius 3.302 projected
  circle A31 centre (-12.7, -342.8031) radius 3.302 projected
  circle A32 centre (-259.6856, -120.9163) radius 3.302 projected
  line L8 (-141.3083, -222.5163) -> (0, -222.5163) projected
  line L9 (-141.3083, -19.3163) -> (0, -19.3163) projected
  line L10 (-136.1923, -235.2163) -> (-136.1923, -222.5163) construction
  line L11 (-136.1923, -6.6163) -> (-183.162, -6.6163) projected
  line L12 (-136.1923, -6.6163) -> (-136.1923, -19.3163) construction
  line L13 (-145.9119, -222.5163) -> (-136.1923, -222.5163)
  line L14 (-145.9119, -19.3163) -> (-136.1923, -19.3163)
  line L15 (-136.1923, -222.5163) -> (-173.6699, -159.0163)
  arc A33 (-145.9119, -19.3163) -> (-145.9119, -222.5163) centre (0, -120.9163) ccw projected
  line L16 (-136.1923, -19.3163) -> (-173.6699, -82.8163)
  arc A34 (-173.6699, -159.0163) -> (-145.9119, -222.5163) centre (0, -120.9163) ccw
  line L17 (-183.162, -19.3163) -> (-145.9119, -19.3163) projected
  arc A35 (-145.9119, -19.3163) -> (-173.6699, -82.8163) centre (0, -120.9163) ccw
  point P0 (0, 0)
  dimension "d49" = 63.5
  dimension "d50" = 63.5
extrude "Extrusion7" add sketch "Sketch9" against normal blind 3.175 contours A0 L15 L8 L13 | A0 L14 L9 L16
properties part number "19in outer coil TOP" material "Copper, Alloy"
